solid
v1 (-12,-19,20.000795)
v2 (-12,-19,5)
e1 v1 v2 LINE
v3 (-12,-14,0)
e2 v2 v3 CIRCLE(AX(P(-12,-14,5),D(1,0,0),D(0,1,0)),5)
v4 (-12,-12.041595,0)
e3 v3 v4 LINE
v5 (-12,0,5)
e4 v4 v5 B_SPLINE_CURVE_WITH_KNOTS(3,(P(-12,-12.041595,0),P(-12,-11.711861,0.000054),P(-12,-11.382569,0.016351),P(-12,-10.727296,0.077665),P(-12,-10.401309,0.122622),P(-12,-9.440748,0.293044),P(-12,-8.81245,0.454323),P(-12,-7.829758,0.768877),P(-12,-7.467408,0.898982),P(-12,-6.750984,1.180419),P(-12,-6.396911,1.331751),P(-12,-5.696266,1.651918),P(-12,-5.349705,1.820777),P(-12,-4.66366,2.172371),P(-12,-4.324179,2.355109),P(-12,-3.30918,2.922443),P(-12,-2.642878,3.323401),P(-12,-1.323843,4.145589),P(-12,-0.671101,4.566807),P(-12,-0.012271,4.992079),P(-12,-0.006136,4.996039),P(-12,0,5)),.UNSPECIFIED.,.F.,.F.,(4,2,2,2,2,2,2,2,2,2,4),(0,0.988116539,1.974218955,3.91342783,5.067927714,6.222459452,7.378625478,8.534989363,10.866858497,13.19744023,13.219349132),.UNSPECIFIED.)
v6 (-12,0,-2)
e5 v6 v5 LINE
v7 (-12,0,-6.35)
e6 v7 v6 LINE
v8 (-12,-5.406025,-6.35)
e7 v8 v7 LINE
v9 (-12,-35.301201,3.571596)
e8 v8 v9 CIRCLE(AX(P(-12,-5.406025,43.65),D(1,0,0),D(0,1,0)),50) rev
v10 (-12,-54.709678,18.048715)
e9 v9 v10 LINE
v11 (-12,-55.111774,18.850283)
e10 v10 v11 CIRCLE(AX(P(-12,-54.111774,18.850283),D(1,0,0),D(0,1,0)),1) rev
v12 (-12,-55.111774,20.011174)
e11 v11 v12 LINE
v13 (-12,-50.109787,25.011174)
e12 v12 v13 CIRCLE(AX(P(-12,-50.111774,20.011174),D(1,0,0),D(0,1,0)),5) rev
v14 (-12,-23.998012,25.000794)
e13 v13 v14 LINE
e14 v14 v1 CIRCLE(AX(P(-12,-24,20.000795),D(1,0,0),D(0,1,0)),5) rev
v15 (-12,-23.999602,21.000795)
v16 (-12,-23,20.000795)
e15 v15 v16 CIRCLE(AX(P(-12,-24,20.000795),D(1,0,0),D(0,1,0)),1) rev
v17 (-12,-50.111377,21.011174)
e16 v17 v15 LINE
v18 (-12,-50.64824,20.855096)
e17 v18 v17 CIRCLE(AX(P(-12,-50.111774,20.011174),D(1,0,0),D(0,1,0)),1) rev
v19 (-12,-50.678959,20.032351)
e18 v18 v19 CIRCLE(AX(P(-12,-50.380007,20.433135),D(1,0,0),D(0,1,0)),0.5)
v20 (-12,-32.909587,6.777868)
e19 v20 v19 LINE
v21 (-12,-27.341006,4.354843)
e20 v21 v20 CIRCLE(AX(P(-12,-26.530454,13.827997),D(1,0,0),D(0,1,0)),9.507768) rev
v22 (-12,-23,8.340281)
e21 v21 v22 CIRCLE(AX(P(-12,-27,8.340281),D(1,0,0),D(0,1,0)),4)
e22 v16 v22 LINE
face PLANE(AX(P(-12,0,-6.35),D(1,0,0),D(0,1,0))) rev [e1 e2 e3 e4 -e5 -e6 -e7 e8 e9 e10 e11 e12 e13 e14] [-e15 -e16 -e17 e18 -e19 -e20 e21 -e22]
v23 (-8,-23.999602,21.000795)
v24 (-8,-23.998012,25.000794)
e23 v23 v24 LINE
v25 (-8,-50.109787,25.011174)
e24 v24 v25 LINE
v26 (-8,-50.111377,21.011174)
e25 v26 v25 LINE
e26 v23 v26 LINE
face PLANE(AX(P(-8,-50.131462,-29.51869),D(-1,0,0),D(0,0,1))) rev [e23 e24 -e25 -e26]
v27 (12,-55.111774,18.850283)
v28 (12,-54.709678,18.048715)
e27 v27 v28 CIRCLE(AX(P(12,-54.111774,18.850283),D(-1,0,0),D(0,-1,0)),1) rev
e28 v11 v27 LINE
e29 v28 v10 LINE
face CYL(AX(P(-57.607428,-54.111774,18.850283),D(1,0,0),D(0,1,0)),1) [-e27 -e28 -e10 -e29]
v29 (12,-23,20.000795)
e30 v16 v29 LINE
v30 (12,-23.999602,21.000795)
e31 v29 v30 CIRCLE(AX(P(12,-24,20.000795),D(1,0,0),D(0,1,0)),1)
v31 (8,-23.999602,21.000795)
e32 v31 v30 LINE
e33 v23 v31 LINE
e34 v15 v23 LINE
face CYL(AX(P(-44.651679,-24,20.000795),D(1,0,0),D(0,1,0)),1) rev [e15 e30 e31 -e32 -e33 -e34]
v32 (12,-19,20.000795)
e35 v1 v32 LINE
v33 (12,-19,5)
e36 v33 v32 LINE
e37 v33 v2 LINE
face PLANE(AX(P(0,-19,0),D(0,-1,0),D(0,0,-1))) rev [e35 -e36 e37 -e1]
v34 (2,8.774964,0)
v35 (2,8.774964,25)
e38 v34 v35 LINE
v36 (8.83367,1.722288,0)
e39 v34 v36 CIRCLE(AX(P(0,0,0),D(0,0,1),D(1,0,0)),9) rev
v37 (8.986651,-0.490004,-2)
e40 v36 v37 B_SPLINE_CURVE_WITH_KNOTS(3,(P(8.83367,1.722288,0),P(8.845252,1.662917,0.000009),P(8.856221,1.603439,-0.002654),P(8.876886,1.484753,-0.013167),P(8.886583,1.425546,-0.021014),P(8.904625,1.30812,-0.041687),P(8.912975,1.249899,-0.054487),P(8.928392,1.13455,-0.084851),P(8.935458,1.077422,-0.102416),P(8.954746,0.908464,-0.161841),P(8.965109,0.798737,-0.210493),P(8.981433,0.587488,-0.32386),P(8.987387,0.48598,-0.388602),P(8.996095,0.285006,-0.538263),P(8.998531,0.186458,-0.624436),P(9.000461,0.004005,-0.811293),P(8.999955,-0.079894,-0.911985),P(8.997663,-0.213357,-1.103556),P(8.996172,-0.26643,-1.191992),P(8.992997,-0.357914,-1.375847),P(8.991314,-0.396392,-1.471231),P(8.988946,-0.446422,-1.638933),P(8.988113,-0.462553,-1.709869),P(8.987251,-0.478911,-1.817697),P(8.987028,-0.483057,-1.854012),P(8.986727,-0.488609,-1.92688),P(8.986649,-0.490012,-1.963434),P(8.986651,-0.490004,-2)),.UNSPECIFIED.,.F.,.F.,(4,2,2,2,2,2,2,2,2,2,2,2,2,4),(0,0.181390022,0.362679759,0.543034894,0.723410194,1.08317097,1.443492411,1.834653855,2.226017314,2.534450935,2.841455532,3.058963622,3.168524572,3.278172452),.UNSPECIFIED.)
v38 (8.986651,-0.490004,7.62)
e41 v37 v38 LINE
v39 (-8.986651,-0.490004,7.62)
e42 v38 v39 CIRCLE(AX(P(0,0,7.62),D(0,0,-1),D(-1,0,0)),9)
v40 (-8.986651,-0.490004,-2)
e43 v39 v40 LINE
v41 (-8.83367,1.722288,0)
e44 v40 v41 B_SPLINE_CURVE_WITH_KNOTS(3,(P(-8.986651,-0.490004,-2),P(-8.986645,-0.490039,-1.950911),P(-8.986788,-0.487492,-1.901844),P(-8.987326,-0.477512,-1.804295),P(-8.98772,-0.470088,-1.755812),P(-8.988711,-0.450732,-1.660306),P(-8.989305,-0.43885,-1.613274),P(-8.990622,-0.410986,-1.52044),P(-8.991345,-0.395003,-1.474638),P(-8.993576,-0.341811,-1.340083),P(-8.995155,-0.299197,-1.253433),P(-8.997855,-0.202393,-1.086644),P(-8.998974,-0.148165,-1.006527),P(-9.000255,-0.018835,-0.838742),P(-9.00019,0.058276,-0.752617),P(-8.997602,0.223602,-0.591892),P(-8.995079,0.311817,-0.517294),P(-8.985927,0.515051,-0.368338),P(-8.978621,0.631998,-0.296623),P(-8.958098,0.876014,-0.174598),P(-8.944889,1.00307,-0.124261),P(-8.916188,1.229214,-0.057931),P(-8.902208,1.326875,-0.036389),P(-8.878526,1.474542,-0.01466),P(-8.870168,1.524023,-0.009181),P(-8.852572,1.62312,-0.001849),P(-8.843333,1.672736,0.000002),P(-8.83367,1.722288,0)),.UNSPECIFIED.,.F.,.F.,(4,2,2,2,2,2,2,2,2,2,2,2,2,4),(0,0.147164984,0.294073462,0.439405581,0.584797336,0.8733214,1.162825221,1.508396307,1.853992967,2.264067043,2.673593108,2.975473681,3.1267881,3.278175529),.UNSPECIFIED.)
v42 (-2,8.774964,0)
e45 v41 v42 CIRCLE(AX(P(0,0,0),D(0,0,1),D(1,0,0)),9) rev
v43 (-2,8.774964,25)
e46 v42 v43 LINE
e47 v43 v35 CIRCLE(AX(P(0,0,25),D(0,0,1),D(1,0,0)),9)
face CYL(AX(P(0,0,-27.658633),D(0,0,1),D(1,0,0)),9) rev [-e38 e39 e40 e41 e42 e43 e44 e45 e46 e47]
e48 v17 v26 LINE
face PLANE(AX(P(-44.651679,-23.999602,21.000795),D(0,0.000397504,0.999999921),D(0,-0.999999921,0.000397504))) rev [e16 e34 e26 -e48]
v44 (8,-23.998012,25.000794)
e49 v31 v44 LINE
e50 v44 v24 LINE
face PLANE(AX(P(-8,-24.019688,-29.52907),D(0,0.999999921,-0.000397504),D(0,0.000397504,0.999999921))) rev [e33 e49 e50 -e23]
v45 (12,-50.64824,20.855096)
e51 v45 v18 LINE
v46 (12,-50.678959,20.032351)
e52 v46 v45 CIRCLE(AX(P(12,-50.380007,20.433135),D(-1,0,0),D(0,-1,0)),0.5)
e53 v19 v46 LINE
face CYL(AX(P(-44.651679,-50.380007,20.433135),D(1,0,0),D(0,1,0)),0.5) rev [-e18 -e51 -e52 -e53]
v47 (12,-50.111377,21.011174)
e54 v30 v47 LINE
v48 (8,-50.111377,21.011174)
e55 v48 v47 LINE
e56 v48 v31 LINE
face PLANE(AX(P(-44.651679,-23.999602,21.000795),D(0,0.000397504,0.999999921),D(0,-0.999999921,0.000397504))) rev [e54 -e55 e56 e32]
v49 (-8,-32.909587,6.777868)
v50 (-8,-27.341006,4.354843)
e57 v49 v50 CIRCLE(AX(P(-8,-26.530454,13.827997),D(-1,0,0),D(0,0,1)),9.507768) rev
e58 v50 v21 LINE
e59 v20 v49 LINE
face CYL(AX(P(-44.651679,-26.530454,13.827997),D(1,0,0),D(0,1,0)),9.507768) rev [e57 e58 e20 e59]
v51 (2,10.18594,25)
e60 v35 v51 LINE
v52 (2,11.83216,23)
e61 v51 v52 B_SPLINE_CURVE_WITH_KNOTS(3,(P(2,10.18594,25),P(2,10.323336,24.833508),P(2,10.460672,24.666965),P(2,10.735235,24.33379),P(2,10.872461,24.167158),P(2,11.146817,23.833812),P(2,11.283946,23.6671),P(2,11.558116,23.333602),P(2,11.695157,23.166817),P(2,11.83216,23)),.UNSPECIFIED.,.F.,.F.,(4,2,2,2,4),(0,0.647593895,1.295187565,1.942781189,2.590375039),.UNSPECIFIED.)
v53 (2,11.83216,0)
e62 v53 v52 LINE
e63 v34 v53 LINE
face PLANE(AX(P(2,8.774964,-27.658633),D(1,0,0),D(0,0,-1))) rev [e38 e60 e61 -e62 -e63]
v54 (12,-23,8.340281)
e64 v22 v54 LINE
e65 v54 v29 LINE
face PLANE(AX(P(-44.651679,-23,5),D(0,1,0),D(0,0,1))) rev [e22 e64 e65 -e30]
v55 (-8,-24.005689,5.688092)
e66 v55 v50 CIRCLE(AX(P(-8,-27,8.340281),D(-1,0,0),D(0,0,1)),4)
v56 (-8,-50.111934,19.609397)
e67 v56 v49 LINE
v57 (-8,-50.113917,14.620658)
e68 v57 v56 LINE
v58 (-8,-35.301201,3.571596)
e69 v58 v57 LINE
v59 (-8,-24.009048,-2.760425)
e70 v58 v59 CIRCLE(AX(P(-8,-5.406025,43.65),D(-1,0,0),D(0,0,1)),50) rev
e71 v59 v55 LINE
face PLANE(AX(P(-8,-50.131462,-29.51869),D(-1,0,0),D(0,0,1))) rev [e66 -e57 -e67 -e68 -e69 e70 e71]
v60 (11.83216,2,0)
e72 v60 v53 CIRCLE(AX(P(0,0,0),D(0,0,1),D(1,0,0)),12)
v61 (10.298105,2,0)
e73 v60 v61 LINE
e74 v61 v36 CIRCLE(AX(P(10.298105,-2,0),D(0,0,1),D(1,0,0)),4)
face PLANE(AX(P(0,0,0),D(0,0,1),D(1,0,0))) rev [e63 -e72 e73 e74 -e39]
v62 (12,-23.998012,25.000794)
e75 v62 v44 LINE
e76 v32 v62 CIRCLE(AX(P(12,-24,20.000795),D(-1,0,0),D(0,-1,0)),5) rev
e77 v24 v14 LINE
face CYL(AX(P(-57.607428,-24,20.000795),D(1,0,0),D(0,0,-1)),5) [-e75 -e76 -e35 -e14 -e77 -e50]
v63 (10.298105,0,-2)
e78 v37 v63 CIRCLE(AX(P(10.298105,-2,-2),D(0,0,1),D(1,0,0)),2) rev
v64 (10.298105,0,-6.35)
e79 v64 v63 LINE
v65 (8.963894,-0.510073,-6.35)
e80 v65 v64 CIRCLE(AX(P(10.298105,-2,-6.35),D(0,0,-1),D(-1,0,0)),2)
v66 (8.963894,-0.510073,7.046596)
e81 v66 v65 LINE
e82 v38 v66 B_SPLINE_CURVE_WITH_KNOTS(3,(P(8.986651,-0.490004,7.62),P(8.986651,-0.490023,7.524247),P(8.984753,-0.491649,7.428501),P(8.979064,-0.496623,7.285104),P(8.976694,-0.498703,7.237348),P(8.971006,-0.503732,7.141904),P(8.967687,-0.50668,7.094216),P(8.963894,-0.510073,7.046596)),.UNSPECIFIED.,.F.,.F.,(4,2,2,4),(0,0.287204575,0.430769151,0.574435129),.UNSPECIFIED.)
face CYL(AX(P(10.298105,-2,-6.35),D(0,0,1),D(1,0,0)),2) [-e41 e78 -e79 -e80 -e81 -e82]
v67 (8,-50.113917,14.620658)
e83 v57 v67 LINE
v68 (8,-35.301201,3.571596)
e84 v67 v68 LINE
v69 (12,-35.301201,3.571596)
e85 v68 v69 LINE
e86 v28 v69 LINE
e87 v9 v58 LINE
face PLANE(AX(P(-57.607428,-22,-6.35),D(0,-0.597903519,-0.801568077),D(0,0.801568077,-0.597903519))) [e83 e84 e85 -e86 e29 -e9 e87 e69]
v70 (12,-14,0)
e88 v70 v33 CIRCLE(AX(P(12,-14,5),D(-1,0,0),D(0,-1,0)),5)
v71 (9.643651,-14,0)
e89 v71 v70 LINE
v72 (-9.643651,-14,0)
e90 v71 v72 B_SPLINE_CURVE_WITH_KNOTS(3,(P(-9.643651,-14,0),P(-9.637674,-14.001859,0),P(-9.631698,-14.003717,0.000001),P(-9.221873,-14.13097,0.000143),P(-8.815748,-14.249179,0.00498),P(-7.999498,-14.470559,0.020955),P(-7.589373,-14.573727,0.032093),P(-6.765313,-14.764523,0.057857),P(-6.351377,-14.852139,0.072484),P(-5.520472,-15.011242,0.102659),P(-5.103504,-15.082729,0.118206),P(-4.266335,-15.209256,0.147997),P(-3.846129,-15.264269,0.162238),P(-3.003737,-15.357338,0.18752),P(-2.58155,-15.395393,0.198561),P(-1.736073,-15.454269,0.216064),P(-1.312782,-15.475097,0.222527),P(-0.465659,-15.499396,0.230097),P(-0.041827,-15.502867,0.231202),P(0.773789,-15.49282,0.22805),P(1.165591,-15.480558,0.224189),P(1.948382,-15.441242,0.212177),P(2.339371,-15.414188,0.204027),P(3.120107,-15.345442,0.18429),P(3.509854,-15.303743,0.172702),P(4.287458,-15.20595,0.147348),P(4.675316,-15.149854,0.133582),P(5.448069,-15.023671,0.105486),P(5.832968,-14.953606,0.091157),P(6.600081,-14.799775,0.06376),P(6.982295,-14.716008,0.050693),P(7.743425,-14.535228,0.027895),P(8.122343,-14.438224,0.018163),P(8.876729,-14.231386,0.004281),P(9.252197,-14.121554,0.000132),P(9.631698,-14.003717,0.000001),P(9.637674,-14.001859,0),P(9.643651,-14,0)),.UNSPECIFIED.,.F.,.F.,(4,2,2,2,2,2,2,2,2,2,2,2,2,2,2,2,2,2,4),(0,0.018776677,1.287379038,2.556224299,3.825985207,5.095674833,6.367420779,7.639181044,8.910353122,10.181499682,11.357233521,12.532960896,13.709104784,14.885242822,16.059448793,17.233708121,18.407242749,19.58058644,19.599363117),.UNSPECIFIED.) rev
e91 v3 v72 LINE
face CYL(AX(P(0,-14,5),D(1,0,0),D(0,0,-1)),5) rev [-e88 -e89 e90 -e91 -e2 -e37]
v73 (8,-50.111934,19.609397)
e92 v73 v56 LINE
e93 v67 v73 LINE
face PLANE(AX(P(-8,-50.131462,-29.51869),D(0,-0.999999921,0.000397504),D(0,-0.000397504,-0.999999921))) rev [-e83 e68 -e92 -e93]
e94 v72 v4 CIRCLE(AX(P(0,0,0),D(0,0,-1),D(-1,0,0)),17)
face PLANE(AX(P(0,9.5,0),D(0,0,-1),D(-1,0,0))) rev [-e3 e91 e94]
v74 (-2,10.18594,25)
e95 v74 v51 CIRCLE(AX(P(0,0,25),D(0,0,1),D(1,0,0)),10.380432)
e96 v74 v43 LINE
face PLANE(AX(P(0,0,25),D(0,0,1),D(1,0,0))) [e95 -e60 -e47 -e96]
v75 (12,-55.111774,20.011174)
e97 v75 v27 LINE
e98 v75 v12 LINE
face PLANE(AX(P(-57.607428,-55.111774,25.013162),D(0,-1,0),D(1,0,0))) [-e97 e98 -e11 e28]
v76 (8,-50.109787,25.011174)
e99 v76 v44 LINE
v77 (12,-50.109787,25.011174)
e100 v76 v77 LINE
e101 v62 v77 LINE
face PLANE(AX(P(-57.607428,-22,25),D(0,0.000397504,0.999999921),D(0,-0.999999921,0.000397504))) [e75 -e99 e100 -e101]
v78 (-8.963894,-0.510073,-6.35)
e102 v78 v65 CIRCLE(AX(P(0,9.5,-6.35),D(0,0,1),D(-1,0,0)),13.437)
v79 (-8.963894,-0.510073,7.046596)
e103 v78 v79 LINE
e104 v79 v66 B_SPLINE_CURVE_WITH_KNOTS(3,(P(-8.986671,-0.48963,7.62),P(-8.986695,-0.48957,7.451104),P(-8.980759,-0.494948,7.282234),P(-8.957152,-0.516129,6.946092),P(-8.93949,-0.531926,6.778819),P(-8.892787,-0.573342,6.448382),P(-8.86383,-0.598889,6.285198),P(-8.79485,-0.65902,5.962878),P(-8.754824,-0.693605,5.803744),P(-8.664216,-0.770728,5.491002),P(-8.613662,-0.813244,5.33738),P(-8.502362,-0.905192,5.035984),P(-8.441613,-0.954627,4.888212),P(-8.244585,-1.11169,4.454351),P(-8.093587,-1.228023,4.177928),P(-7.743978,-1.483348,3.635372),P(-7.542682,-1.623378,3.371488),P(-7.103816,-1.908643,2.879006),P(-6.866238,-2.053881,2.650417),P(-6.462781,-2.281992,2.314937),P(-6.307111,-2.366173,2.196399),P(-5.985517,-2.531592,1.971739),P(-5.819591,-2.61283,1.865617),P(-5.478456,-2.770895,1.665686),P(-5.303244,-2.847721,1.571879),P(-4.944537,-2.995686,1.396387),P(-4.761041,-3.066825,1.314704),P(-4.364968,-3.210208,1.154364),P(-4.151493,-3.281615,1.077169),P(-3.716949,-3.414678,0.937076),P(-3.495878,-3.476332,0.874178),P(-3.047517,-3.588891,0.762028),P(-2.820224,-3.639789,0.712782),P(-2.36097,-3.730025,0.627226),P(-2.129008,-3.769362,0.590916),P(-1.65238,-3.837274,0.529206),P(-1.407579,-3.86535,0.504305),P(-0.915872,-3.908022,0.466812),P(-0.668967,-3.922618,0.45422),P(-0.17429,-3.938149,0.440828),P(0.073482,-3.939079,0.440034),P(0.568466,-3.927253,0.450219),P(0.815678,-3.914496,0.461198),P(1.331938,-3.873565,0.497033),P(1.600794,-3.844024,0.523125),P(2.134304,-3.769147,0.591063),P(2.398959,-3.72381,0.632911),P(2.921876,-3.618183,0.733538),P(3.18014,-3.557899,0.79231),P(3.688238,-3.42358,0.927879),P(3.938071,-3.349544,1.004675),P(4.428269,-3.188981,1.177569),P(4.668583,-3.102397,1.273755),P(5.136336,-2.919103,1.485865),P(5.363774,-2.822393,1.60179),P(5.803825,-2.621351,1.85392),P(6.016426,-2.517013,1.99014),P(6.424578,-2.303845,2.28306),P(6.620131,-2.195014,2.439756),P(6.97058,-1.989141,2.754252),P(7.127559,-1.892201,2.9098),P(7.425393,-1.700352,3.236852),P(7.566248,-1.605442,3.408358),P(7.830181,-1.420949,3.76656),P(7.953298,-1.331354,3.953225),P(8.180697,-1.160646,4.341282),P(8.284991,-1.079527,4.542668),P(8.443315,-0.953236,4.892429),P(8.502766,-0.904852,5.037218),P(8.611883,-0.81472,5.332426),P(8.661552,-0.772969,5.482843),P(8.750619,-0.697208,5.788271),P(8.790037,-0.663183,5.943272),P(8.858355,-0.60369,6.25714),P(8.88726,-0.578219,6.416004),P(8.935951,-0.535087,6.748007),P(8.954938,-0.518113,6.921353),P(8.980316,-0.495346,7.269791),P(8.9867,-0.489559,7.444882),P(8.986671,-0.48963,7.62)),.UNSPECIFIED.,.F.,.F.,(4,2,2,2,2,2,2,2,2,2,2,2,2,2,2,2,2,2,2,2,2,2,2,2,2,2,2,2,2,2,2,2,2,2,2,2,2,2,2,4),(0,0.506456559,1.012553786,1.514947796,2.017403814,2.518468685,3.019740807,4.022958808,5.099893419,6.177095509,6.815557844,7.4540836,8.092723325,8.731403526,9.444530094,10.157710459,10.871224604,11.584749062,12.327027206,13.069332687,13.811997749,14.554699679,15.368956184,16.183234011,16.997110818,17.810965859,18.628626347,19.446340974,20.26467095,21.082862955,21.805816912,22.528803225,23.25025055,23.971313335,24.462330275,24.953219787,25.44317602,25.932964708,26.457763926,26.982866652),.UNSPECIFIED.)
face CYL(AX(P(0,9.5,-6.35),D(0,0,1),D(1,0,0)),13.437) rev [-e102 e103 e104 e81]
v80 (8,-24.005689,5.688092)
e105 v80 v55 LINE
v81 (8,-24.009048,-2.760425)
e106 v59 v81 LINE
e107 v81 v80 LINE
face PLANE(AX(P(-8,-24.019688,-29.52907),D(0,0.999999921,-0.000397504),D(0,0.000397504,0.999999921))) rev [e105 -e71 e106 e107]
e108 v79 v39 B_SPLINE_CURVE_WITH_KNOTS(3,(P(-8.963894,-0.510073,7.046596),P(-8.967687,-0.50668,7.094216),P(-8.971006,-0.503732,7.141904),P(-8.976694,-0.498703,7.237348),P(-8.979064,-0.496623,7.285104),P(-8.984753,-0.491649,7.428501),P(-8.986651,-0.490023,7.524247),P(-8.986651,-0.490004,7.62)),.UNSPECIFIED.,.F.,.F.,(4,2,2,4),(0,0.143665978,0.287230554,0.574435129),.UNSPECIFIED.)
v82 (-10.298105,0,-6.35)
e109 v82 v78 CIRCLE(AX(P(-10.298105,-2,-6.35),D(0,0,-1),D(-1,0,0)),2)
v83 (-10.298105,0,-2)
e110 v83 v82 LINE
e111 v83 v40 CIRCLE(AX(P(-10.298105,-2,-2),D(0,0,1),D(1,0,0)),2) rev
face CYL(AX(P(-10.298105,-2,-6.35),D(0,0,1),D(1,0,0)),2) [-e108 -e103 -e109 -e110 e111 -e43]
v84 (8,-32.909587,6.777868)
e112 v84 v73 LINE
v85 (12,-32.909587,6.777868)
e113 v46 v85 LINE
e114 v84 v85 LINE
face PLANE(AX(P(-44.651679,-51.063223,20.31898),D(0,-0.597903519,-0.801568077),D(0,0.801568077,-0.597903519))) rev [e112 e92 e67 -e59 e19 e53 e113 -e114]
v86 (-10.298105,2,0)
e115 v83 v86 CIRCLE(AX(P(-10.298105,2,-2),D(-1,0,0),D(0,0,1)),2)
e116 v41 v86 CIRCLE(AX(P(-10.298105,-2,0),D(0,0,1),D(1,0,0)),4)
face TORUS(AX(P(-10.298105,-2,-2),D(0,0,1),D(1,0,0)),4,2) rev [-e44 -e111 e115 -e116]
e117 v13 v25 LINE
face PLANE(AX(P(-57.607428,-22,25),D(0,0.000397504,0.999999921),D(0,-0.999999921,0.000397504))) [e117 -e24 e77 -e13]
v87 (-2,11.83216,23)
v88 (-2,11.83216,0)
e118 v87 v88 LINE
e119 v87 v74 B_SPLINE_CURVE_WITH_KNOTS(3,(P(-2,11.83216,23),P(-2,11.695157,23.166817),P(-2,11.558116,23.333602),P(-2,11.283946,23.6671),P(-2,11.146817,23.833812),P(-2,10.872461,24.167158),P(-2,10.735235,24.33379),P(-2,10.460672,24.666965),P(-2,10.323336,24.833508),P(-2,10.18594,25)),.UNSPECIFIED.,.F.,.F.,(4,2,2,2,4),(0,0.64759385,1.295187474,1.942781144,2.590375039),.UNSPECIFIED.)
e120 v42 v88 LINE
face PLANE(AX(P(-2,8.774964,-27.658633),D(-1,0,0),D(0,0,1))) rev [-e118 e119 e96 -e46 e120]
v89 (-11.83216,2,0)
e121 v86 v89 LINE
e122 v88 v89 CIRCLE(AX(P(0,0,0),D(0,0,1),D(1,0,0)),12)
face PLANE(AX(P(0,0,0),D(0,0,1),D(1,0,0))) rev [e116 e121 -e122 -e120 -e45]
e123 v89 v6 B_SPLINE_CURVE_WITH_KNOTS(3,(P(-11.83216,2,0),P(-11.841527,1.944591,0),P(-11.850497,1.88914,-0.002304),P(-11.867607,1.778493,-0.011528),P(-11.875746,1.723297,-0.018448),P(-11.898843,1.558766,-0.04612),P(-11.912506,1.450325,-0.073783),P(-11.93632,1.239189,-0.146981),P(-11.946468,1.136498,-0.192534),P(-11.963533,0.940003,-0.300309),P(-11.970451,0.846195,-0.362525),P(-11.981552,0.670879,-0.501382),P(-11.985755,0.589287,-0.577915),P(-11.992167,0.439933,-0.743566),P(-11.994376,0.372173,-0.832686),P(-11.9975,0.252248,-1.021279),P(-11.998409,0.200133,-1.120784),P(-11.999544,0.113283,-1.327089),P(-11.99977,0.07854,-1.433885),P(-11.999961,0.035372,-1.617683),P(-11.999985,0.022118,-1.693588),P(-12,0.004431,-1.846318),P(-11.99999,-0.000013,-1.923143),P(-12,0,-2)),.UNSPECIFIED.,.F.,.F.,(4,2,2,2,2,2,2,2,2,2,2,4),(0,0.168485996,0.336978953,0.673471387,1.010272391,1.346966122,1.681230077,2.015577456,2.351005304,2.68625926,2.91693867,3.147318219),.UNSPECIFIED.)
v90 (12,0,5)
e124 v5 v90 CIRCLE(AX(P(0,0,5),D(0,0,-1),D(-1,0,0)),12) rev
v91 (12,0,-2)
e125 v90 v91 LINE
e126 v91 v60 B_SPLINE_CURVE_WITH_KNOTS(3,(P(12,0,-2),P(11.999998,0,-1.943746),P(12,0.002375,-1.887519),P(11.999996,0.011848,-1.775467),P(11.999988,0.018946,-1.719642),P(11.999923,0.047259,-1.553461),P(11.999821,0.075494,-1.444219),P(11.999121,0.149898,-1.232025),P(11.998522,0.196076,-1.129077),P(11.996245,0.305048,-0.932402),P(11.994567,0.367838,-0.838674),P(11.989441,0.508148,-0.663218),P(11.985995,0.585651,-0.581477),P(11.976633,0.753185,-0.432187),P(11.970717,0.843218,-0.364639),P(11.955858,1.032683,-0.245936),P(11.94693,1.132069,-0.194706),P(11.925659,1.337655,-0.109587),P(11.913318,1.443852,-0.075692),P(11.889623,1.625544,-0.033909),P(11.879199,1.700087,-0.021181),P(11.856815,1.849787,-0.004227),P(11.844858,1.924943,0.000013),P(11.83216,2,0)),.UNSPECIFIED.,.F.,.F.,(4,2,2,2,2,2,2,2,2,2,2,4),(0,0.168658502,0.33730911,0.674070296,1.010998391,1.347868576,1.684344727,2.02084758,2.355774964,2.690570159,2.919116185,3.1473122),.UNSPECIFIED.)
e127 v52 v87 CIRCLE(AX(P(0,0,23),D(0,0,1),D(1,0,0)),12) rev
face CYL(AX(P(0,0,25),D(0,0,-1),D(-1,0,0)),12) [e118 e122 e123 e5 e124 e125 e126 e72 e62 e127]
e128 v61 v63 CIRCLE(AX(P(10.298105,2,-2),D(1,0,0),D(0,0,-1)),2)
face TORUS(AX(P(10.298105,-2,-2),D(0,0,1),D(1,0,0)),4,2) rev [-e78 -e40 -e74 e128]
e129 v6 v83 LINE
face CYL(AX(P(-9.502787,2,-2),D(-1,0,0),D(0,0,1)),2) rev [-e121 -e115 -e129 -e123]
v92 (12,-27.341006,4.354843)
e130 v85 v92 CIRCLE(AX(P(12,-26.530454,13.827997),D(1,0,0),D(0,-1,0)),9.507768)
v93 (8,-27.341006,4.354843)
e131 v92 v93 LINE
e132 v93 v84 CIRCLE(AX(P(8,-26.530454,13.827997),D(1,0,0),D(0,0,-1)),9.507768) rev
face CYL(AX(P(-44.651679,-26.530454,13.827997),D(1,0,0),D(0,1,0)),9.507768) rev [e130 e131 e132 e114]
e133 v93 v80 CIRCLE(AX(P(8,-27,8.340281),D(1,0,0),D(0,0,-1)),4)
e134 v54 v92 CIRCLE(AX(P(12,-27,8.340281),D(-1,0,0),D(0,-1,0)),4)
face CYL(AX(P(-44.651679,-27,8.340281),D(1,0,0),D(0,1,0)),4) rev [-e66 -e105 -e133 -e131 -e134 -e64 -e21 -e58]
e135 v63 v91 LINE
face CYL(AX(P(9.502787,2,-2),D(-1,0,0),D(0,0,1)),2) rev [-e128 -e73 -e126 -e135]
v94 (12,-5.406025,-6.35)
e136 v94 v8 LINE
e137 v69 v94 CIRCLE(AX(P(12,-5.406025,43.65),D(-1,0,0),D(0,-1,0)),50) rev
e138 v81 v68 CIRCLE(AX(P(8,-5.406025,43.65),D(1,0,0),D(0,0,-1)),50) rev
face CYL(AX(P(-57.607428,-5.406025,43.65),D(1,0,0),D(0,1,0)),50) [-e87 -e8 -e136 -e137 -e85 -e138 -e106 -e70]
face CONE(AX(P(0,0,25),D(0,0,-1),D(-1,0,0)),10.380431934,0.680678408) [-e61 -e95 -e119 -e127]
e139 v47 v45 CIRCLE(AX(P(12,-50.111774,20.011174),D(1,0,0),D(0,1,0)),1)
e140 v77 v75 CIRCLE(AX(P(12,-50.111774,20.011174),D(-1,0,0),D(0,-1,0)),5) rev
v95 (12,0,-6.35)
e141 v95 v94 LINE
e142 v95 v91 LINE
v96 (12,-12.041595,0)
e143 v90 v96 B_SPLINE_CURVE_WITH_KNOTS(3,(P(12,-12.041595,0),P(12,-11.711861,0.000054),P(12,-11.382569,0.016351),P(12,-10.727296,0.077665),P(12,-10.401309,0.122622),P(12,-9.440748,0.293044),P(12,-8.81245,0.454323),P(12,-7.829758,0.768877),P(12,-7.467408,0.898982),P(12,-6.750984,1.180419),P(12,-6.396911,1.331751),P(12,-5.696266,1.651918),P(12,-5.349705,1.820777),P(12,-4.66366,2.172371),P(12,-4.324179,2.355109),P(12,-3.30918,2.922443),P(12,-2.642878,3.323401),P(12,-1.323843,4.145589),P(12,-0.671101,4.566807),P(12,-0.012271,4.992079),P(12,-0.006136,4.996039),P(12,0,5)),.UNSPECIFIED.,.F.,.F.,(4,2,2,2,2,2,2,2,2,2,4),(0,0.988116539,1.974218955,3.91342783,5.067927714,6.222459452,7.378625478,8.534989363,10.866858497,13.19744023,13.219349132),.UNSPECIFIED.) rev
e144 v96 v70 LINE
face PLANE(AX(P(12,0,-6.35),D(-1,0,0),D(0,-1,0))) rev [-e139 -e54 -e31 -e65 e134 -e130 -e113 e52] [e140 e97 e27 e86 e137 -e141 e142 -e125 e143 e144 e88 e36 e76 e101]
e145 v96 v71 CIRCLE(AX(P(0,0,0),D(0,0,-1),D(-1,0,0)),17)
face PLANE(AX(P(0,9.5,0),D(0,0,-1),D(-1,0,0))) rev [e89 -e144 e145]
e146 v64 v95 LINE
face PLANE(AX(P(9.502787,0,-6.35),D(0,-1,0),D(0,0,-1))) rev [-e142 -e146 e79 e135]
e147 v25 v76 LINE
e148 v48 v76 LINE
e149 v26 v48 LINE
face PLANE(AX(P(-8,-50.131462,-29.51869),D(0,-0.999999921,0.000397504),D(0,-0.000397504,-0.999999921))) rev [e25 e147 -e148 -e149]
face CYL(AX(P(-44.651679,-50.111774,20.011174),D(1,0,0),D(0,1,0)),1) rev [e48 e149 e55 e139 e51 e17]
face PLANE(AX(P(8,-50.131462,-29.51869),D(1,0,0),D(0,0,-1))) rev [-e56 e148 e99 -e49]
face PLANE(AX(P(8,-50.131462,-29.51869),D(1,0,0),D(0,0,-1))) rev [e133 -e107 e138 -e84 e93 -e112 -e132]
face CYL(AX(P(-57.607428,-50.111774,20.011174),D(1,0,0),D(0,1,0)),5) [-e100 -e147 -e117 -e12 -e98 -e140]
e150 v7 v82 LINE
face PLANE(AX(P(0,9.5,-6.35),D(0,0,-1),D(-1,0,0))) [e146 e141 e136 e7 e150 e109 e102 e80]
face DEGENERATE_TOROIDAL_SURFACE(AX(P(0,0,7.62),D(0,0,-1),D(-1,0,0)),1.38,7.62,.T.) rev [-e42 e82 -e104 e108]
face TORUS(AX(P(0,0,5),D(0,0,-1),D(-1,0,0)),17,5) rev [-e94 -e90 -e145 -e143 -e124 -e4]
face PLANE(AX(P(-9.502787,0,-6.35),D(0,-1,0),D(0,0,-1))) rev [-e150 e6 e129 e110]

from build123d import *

# Parameters (mm, degrees)
SKETCH1_R           = 12
BOSS_EXTRUDE1_DEPTH = 25
CUT_EXTRUDE1_DEPTH  = 25
BOSS_EXTRUDE2_DEPTH = 6.35
FILLET1_R           = 7.62
CHAMFER1_SIZE       = 2
CHAMFER1_SIZE2      = 1.6195680663900194
BOSS_EXTRUDE3_DEPTH = 3
BOSS_EXTRUDE4_DEPTH = 24
FILLET3_R           = 50
FILLET7_R           = 5
FILLET8_R           = 5
FILLET9_R           = 5
CUT_EXTRUDE2_DEPTH  = 24
FILLET10_R          = 1
FILLET12_R          = 2
FILLET13_R          = 2
CUT_EXTRUDE3_REACH  = 66.534
SKETCH9_W           = 16.00000000000001
SKETCH9_H           = 26.111776117406702
FILLET14_R          = 0.5
FILLET15_R          = 4


with BuildPart() as part:
    # Sketch1 → Boss-Extrude1 (new body)
    with BuildSketch(Plane.XY):
        Circle(SKETCH1_R)
    extrude(amount=BOSS_EXTRUDE1_DEPTH)

    # Sketch2 → Cut-Extrude1 (cut)
    with BuildSketch(Plane.XY.offset(25)):
        with BuildLine():
            Line((-2, 12), (2, 12))
            Line((2, 12), (2, 8.77496438739212))
            ThreePointArc((2, 8.77496438739212), (-1.65e-15, -8.999999999999998), (-2, 8.77496438739212))
            Line((-2, 8.77496438739212), (-2, 12))
        make_face()
    extrude(amount=-CUT_EXTRUDE1_DEPTH, mode=Mode.SUBTRACT)

    # Sketch3 → Boss-Extrude2 (add)
    with BuildSketch(Plane(origin=(0, 0, 0), x_dir=(-1, 0, 0), z_dir=(0, 0, -1))):
        with BuildLine():
            Line((-9.50278743316929, 0), (-12.000000000000002, 0))
            Line((-12.000000000000002, 0), (-12.000000000000004, -19))
            Line((-12.000000000000004, -19), (12.000000000000004, -19))
            Line((12.000000000000004, -19), (12.000000000000002, 0))
            Line((12.000000000000002, 0), (9.50278743316929, 0))
            ThreePointArc((9.50278743316929, 0), (8.2e-16, -3.9369999999999994), (-9.50278743316929, 0))
        make_face()
    extrude(amount=BOSS_EXTRUDE2_DEPTH)

    # Fillet1
    # the kernel refuses this fillet: 7.62 mm, written as the material it adds along each edge
    with BuildSketch(Plane(origin=(-8.3e-16, 4.2e-16, 0), x_dir=(0.0031415874858799547, 0.9999950652018581, 0), z_dir=(-0.9999950652018581, 0.0031415874858799547, 0))) as fillet1_piece_1_section:
        with BuildLine():
            CenterArc((8.999999999999998 - FILLET1_R, -FILLET1_R), FILLET1_R, 0, 89.99999999999999)
            Line((8.999999999999998 - FILLET1_R, 2.66e-15), (8.999999999999998, 0))
            Line((8.999999999999998, 0), (8.999999999999996, -FILLET1_R))
        make_face()
    fillet1_piece_1 = revolve(axis=Axis((-8.3e-16, 4.2e-16, 0), (0, 0, -1)), revolution_arc=359.64, mode=Mode.PRIVATE)
    fillet1_piece_1 = fillet1_piece_1 - Plane(origin=(0, 9.500000000000028, 1.752978238820399), x_dir=(-0.7072104958822112, -0.7070030512763273, 0), z_dir=(0, 0, 1)) * Cylinder(13.437000000000028, 36, mode=Mode.PRIVATE)
    add(fillet1_piece_1)

    # Chamfer1
    chamfer1_edges = [part.edges().sort_by_distance(p)[0] for p in [
        (-1.0525e-13, -12, 25),
    ]]
    chamfer1_side = [part.faces().sort_by_distance(p)[0] for p in [
        (-2.2e-15, -12, 12.5),
    ]]
    chamfer(chamfer1_edges, length=CHAMFER1_SIZE, length2=CHAMFER1_SIZE2, reference=chamfer1_side[0])

    # Sketch6 → Boss-Extrude3 (add)
    with BuildSketch(Plane.XZ.offset(19)):
        Polygon((-12.000000000000007, 25), (-12.000000000000005, -6.35), (12.000000000000005, -6.35), (12.000000000000004, 25.00000000000001), align=None)
    extrude(amount=BOSS_EXTRUDE3_DEPTH)

    # Sketch7 → Boss-Extrude4 (add)
    with BuildSketch(Plane(origin=(12.000000000000002, 1.1e-15, 0), x_dir=(0, 0, -1), z_dir=(1, 1.9e-16, 0))):
        Polygon((-25.00000000000001, -22.000000000000004), (6.35, -22.000000000000004), (-18.348646063087493, -55.11177405445072), (-25.013162071560505, -55.11177405445072), align=None)
    extrude(amount=-BOSS_EXTRUDE4_DEPTH)

    # Fillet3
    fillet3_edges = [part.edges().sort_by_distance(p)[0] for p in [
        (0, -22, -6.35),
    ]]
    fillet(fillet3_edges, radius=FILLET3_R)

    # Fillet7
    # the kernel refuses this fillet: 5 mm, written as the material it adds along each edge
    with BuildSketch(Plane(origin=(0, 0, 0), x_dir=(-1, 6e-17, 0), z_dir=(6e-17, 1, 0))) as fillet7_piece_1_section:
        with BuildLine():
            CenterArc((12.000000000000002 + FILLET7_R, FILLET7_R), FILLET7_R, 180, 90)
            Line((12, FILLET7_R), (12.000000000000002, 0))
            Line((12.000000000000002, 0), (12.000000000000002 + FILLET7_R, 0))
        make_face()
    fillet7_piece_1 = revolve(axis=Axis((0, 0, 0), (0, 0, 1)), revolution_arc=179.99999999999997, mode=Mode.PRIVATE)
    fillet7_piece_1 = split(fillet7_piece_1, bisect_by=Plane(origin=(12.000000000000004, -12.055106327045037, 2.4999999999999996), z_dir=(-1, -9e-17, 0)), keep=Keep.TOP, mode=Mode.PRIVATE)
    fillet7_piece_1 = split(fillet7_piece_1, bisect_by=Plane(origin=(-12.000000000000004, -12.055106327045038, 2.4999999999999996), z_dir=(1, -9e-17, 0)), keep=Keep.TOP, mode=Mode.PRIVATE)
    add(fillet7_piece_1)
    with BuildSketch(Plane(origin=(12.000000000000004, -19, 0), x_dir=(0, 1, 0), z_dir=(-1, 0, 0))) as fillet7_piece_2:
        with BuildLine():
            CenterArc((FILLET7_R, -FILLET7_R), FILLET7_R, 90, 90)
            Line((0, -FILLET7_R), (0, 0))
            Line((0, 0), (FILLET7_R, 0))
        make_face()
    extrude(amount=24.000000000000007)

    # Fillet8
    fillet8_edges = [part.edges().sort_by_distance(p)[0] for p in [
        (1.243e-14, -55.11177405445072, 25.013162071560505),
    ]]
    fillet(fillet8_edges, radius=FILLET8_R)

    # Fillet9
    fillet9_edges = [part.edges().sort_by_distance(p)[0] for p in [
        (-1.78e-15, -19, 25.000000000000007),
    ]]
    fillet(fillet9_edges, radius=FILLET9_R)

    # Sketch8 → Cut-Extrude2 (cut)
    with BuildSketch(Plane(origin=(12.000000000000002, 1.1e-15, 0), x_dir=(0, 0, -1), z_dir=(1, 1.9e-16, 0))):
        with BuildLine():
            Line((-4.999999999999998, -23), (-20.000794613515104, -23.000000000000004))
            ThreePointArc((-20.000794613515104, -23.000000000000004), (-20.70776084176148, -23.292752693805703), (-21.000794534510295, -23.999602495761817))
            Line((-21.000794534510295, -23.999602495761817), (-21.011174076183625, -50.11137655021254))
            ThreePointArc((-21.011174076183625, -50.11137655021254), (-20.819933843558175, -50.699913295165096), (-20.318980441541633, -51.06322310199948))
            Line((-20.318980441541633, -51.06322310199948), (-6.777868461008763, -32.90958669617576))
            ThreePointArc((-6.777868461008763, -32.90958669617576), (-4.469648137926145, -28.20942596380706), (-4.999999999999998, -23))
        make_face()
    extrude(amount=-CUT_EXTRUDE2_DEPTH, mode=Mode.SUBTRACT)

    # Fillet10
    fillet10_edges = [part.edges().sort_by_distance(p)[0] for p in [
        (1.243e-14, -55.11177405445072, 18.348646063087493),
    ]]
    fillet(fillet10_edges, radius=FILLET10_R)

    # Fillet12
    fillet12_edges = [part.edges().sort_by_distance(p)[0] for p in [
        (-9.502787433169292, -8.9e-16, -3.175),
        (9.502787433169292, -8.9e-16, -3.175),
    ]]
    fillet(fillet12_edges, radius=FILLET12_R)

    # Fillet13
    # the kernel refuses this fillet: 2 mm, written as the material it adds along each edge
    with BuildSketch(Plane(origin=(10.298105116962052, 0, 0), x_dir=(0, 0, -1), z_dir=(1, 0, 0))) as fillet13_piece_1_section:
        with BuildLine():
            CenterArc((FILLET13_R, FILLET13_R), FILLET13_R, 180, 90)
            Line((-2.2e-16, FILLET13_R), (0, 0))
            Line((0, 0), (FILLET13_R, 0))
        make_face()
    fillet13_piece_1 = extrude(amount=6.701894883037948, mode=Mode.PRIVATE)
    fillet13_piece_1 = fillet13_piece_1 & Plane(origin=(0, 0, -0.44903446636731825), x_dir=(1, 0, 0), z_dir=(0, 0, -1)) * Cylinder(12, 22, mode=Mode.PRIVATE)
    add(fillet13_piece_1)
    with BuildSketch(Plane(origin=(-10.298105116962049, -2, 0), x_dir=(-0.07369380939887726, -0.9972809145152042, 0), z_dir=(-0.9972809145152042, 0.07369380939887726, 0))) as fillet13_piece_2_section:
        with BuildLine():
            CenterArc((2.0000000000000004 + FILLET13_R, -FILLET13_R), FILLET13_R, 89.99999999999997, 90)
            Line((2.0000000000000004 + FILLET13_R, 2.2e-16), (2.0000000000000004, 0))
            Line((2.0000000000000004, 0), (2, -FILLET13_R))
        make_face()
    fillet13_piece_2 = revolve(axis=Axis((-10.298105116962049, -2, 0), (0, 0, 1)), revolution_arc=184.22617539365706, mode=Mode.PRIVATE)
    fillet13_piece_2 = fillet13_piece_2 - Plane(origin=(-8.3e-16, 4.2e-16, -0.6407272575669332), x_dir=(0.22222222222222238, 0.9749960430435691, 0), z_dir=(0, 0, 1)) * Cylinder(8.999999999999998, 17, mode=Mode.PRIVATE)
    add(fillet13_piece_2)
    with BuildSketch(Plane(origin=(10.298105116962052, -2, 0), x_dir=(0, 1, 0), z_dir=(1, 0, 0))) as fillet13_piece_3_section:
        with BuildLine():
            CenterArc((2 + FILLET13_R, -FILLET13_R), FILLET13_R, 90, 90)
            Line((2 + FILLET13_R, 2.2e-16), (2, 0))
            Line((2, 0), (2, -FILLET13_R))
        make_face()
    fillet13_piece_3 = revolve(axis=Axis((10.298105116962052, -2, 0), (0, 0, 1)), revolution_arc=184.22617539365754, mode=Mode.PRIVATE)
    fillet13_piece_3 = fillet13_piece_3 - Plane(origin=(-8.3e-16, 4.2e-16, -0.8153326958488982), x_dir=(0.22222222222222238, 0.9749960430435691, 0), z_dir=(0, 0, 1)) * Cylinder(8.999999999999998, 16, mode=Mode.PRIVATE)
    add(fillet13_piece_3)
    with BuildSketch(Plane(origin=(-17, 0, 0), x_dir=(0, 0, -1), z_dir=(1, 0, 0))) as fillet13_piece_4_section:
        with BuildLine():
            CenterArc((FILLET13_R, FILLET13_R), FILLET13_R, 180, 90)
            Line((-2.2e-16, FILLET13_R), (0, 0))
            Line((0, 0), (FILLET13_R, 0))
        make_face()
    fillet13_piece_4 = extrude(amount=6.7018948830379514, mode=Mode.PRIVATE)
    fillet13_piece_4 = fillet13_piece_4 & Plane(origin=(0, 0, -0.4490342356486683), x_dir=(1, 0, 0), z_dir=(0, 0, -1)) * Cylinder(12, 22, mode=Mode.PRIVATE)
    add(fillet13_piece_4)

    # Cut-Extrude3: up to this plane
    cut_extrude3_end = Plane(origin=(-57.60742830022284, -22.000000000000018, -6.35), z_dir=(0, -0.5979035190056836, -0.8015680769345921))
    # Sketch9 → Cut-Extrude3 (cut, up to the surface)
    with BuildSketch(Plane(origin=(0, 0.00993412895799998, 24.991250957210262), x_dir=(1, 0, 0), z_dir=(0, 0.0003975042381898005, 0.9999999209951873)), mode=Mode.PRIVATE) as cut_extrude3_sk1:
        with Locations((0, -37.06383656321388)):
            Rectangle(SKETCH9_W, SKETCH9_H)
    cut_extrude3_tool1 = split(extrude(cut_extrude3_sk1.sketch, amount=-CUT_EXTRUDE3_REACH, mode=Mode.PRIVATE), bisect_by=cut_extrude3_end, keep=Keep.BOTH, mode=Mode.PRIVATE)
    add(cut_extrude3_tool1.solids().sort_by_distance((0, -37.0539, 25.005984))[0], mode=Mode.SUBTRACT)

    # Fillet14
    fillet14_edges = [part.edges().sort_by_distance(p)[0] for p in [
        (1.243e-14, -51.06322310199948, 20.318980441541633),
    ]]
    fillet(fillet14_edges, radius=FILLET14_R)

    # Fillet15
    # the kernel refuses this fillet: 4 mm, written as the material it adds along each edge
    with BuildSketch(Plane(origin=(12.000000000000007, -23, 4.999999999999999), x_dir=(0, -0.9891358109581738, -0.14700458319425255), z_dir=(-1, -1.9e-16, 0))) as fillet15_piece_1_section:
        with BuildLine():
            CenterArc((3.4655066348003034, 3.8920098406036834), FILLET15_R, 188.453377446245, 94.89048853854467)
            Line((-0.49103660903239127, 3.30399150782667), (0, 0))
            ThreePointArc((0, 0), (2.194342799690448, -0.2566863390527839), (4.388685599380896, -1e-17))
        make_face()
    fillet15_piece_1 = extrude(amount=24, mode=Mode.PRIVATE)
    fillet15_piece_1 = split(fillet15_piece_1, bisect_by=Plane(origin=(9.999999999999988, -24.006080855539047, 4.703209142937297), z_dir=(0, -0.9999999209951872, 0.0003975042381898005)), keep=Keep.TOP, mode=Mode.PRIVATE)
    fillet15_piece_1 = split(fillet15_piece_1, bisect_by=Plane(origin=(8.000000000000005, -24.97983402678631, 4.7035962139803935), z_dir=(1, 0, 0)), keep=Keep.TOP, mode=Mode.PRIVATE)
    add(fillet15_piece_1)
    with BuildSketch(Plane(origin=(12.000000000000007, -23, 4.999999999999999), x_dir=(0, -0.9891358109581738, -0.14700458319425255), z_dir=(-1, -1.9e-16, 0))) as fillet15_piece_2_section:
        with BuildLine():
            CenterArc((3.4655066348003034, 3.8920098406036834), FILLET15_R, 188.453377446245, 94.89048853854467)
            Line((-0.49103660903239127, 3.30399150782667), (0, 0))
            ThreePointArc((0, 0), (2.194342799690448, -0.2566863390527839), (4.388685599380896, -1e-17))
        make_face()
    fillet15_piece_2 = extrude(amount=24, mode=Mode.PRIVATE)
    fillet15_piece_2 = split(fillet15_piece_2, bisect_by=Plane(origin=(10.000000000000005, -24.005623928158137, 5.8526996411826), z_dir=(0, 0.9999999209951872, -0.0003975042381898005)), keep=Keep.TOP, mode=Mode.PRIVATE)
    fillet15_piece_2 = split(fillet15_piece_2, bisect_by=Plane(origin=(8.000000000000005, -23.360559138010366, 5.852443225174344), z_dir=(1, 0, 0)), keep=Keep.TOP, mode=Mode.PRIVATE)
    add(fillet15_piece_2)
    with BuildSketch(Plane(origin=(12.000000000000007, -23, 4.999999999999999), x_dir=(0, -0.9891358109581738, -0.14700458319425255), z_dir=(-1, -1.9e-16, 0))) as fillet15_piece_3_section:
        with BuildLine():
            CenterArc((3.4655066348003034, 3.8920098406036834), FILLET15_R, 188.453377446245, 94.89048853854467)
            Line((-0.49103660903239127, 3.30399150782667), (0, 0))
            ThreePointArc((0, 0), (2.194342799690448, -0.2566863390527839), (4.388685599380896, -1e-17))
        make_face()
    fillet15_piece_3 = extrude(amount=24, mode=Mode.PRIVATE)
    fillet15_piece_3 = split(fillet15_piece_3, bisect_by=Plane(origin=(-8.000000000000005, -23.360559138010377, 5.852443225174344), z_dir=(1, 0, 0)), keep=Keep.TOP, mode=Mode.PRIVATE)
    fillet15_piece_3 = split(fillet15_piece_3, bisect_by=Plane(origin=(-2.309e-14, -24.005623928158137, 5.8526996411826), z_dir=(0, 0.9999999209951872, -0.0003975042381898005)), keep=Keep.TOP, mode=Mode.PRIVATE)
    fillet15_piece_3 = split(fillet15_piece_3, bisect_by=Plane(origin=(8.000000000000005, -23.36055913801037, 5.852443225174344), z_dir=(-1, 0, 0)), keep=Keep.TOP, mode=Mode.PRIVATE)
    add(fillet15_piece_3)
    with BuildSketch(Plane(origin=(12.000000000000007, -23, 4.999999999999999), x_dir=(0, -0.9891358109581738, -0.14700458319425255), z_dir=(-1, -1.9e-16, 0))) as fillet15_piece_4_section:
        with BuildLine():
            CenterArc((3.4655066348003034, 3.8920098406036834), FILLET15_R, 188.453377446245, 94.89048853854467)
            Line((-0.49103660903239127, 3.30399150782667), (0, 0))
            ThreePointArc((0, 0), (2.194342799690448, -0.2566863390527839), (4.388685599380896, -1e-17))
        make_face()
    fillet15_piece_4 = extrude(amount=24, mode=Mode.PRIVATE)
    fillet15_piece_4 = split(fillet15_piece_4, bisect_by=Plane(origin=(-8.000000000000005, -24.979834026786307, 4.7035962139803935), z_dir=(-1, 0, 0)), keep=Keep.TOP, mode=Mode.PRIVATE)
    fillet15_piece_4 = split(fillet15_piece_4, bisect_by=Plane(origin=(-10.000000000000005, -24.006080855539047, 4.703209142937297), z_dir=(0, -0.9999999209951872, 0.0003975042381898005)), keep=Keep.TOP, mode=Mode.PRIVATE)
    add(fillet15_piece_4)
    with BuildSketch(Plane(origin=(12.000000000000007, -23, 4.999999999999999), x_dir=(0, -0.9891358109581738, -0.14700458319425255), z_dir=(-1, -1.9e-16, 0))) as fillet15_piece_5_section:
        with BuildLine():
            CenterArc((3.4655066348003034, 3.8920098406036834), FILLET15_R, 188.453377446245, 94.89048853854467)
            Line((-0.49103660903239127, 3.30399150782667), (0, 0))
            ThreePointArc((0, 0), (2.194342799690448, -0.2566863390527839), (4.388685599380896, -1e-17))
        make_face()
    fillet15_piece_5 = extrude(amount=24, mode=Mode.PRIVATE)
    fillet15_piece_5 = split(fillet15_piece_5, bisect_by=Plane(origin=(-8.000000000000005, -23.36055913801038, 5.852443225174344), z_dir=(-1, 0, 0)), keep=Keep.TOP, mode=Mode.PRIVATE)
    fillet15_piece_5 = split(fillet15_piece_5, bisect_by=Plane(origin=(-10.000000000000002, -24.005623928158137, 5.8526996411826), z_dir=(0, 0.9999999209951872, -0.0003975042381898005)), keep=Keep.TOP, mode=Mode.PRIVATE)
    add(fillet15_piece_5)


solid = part.part
